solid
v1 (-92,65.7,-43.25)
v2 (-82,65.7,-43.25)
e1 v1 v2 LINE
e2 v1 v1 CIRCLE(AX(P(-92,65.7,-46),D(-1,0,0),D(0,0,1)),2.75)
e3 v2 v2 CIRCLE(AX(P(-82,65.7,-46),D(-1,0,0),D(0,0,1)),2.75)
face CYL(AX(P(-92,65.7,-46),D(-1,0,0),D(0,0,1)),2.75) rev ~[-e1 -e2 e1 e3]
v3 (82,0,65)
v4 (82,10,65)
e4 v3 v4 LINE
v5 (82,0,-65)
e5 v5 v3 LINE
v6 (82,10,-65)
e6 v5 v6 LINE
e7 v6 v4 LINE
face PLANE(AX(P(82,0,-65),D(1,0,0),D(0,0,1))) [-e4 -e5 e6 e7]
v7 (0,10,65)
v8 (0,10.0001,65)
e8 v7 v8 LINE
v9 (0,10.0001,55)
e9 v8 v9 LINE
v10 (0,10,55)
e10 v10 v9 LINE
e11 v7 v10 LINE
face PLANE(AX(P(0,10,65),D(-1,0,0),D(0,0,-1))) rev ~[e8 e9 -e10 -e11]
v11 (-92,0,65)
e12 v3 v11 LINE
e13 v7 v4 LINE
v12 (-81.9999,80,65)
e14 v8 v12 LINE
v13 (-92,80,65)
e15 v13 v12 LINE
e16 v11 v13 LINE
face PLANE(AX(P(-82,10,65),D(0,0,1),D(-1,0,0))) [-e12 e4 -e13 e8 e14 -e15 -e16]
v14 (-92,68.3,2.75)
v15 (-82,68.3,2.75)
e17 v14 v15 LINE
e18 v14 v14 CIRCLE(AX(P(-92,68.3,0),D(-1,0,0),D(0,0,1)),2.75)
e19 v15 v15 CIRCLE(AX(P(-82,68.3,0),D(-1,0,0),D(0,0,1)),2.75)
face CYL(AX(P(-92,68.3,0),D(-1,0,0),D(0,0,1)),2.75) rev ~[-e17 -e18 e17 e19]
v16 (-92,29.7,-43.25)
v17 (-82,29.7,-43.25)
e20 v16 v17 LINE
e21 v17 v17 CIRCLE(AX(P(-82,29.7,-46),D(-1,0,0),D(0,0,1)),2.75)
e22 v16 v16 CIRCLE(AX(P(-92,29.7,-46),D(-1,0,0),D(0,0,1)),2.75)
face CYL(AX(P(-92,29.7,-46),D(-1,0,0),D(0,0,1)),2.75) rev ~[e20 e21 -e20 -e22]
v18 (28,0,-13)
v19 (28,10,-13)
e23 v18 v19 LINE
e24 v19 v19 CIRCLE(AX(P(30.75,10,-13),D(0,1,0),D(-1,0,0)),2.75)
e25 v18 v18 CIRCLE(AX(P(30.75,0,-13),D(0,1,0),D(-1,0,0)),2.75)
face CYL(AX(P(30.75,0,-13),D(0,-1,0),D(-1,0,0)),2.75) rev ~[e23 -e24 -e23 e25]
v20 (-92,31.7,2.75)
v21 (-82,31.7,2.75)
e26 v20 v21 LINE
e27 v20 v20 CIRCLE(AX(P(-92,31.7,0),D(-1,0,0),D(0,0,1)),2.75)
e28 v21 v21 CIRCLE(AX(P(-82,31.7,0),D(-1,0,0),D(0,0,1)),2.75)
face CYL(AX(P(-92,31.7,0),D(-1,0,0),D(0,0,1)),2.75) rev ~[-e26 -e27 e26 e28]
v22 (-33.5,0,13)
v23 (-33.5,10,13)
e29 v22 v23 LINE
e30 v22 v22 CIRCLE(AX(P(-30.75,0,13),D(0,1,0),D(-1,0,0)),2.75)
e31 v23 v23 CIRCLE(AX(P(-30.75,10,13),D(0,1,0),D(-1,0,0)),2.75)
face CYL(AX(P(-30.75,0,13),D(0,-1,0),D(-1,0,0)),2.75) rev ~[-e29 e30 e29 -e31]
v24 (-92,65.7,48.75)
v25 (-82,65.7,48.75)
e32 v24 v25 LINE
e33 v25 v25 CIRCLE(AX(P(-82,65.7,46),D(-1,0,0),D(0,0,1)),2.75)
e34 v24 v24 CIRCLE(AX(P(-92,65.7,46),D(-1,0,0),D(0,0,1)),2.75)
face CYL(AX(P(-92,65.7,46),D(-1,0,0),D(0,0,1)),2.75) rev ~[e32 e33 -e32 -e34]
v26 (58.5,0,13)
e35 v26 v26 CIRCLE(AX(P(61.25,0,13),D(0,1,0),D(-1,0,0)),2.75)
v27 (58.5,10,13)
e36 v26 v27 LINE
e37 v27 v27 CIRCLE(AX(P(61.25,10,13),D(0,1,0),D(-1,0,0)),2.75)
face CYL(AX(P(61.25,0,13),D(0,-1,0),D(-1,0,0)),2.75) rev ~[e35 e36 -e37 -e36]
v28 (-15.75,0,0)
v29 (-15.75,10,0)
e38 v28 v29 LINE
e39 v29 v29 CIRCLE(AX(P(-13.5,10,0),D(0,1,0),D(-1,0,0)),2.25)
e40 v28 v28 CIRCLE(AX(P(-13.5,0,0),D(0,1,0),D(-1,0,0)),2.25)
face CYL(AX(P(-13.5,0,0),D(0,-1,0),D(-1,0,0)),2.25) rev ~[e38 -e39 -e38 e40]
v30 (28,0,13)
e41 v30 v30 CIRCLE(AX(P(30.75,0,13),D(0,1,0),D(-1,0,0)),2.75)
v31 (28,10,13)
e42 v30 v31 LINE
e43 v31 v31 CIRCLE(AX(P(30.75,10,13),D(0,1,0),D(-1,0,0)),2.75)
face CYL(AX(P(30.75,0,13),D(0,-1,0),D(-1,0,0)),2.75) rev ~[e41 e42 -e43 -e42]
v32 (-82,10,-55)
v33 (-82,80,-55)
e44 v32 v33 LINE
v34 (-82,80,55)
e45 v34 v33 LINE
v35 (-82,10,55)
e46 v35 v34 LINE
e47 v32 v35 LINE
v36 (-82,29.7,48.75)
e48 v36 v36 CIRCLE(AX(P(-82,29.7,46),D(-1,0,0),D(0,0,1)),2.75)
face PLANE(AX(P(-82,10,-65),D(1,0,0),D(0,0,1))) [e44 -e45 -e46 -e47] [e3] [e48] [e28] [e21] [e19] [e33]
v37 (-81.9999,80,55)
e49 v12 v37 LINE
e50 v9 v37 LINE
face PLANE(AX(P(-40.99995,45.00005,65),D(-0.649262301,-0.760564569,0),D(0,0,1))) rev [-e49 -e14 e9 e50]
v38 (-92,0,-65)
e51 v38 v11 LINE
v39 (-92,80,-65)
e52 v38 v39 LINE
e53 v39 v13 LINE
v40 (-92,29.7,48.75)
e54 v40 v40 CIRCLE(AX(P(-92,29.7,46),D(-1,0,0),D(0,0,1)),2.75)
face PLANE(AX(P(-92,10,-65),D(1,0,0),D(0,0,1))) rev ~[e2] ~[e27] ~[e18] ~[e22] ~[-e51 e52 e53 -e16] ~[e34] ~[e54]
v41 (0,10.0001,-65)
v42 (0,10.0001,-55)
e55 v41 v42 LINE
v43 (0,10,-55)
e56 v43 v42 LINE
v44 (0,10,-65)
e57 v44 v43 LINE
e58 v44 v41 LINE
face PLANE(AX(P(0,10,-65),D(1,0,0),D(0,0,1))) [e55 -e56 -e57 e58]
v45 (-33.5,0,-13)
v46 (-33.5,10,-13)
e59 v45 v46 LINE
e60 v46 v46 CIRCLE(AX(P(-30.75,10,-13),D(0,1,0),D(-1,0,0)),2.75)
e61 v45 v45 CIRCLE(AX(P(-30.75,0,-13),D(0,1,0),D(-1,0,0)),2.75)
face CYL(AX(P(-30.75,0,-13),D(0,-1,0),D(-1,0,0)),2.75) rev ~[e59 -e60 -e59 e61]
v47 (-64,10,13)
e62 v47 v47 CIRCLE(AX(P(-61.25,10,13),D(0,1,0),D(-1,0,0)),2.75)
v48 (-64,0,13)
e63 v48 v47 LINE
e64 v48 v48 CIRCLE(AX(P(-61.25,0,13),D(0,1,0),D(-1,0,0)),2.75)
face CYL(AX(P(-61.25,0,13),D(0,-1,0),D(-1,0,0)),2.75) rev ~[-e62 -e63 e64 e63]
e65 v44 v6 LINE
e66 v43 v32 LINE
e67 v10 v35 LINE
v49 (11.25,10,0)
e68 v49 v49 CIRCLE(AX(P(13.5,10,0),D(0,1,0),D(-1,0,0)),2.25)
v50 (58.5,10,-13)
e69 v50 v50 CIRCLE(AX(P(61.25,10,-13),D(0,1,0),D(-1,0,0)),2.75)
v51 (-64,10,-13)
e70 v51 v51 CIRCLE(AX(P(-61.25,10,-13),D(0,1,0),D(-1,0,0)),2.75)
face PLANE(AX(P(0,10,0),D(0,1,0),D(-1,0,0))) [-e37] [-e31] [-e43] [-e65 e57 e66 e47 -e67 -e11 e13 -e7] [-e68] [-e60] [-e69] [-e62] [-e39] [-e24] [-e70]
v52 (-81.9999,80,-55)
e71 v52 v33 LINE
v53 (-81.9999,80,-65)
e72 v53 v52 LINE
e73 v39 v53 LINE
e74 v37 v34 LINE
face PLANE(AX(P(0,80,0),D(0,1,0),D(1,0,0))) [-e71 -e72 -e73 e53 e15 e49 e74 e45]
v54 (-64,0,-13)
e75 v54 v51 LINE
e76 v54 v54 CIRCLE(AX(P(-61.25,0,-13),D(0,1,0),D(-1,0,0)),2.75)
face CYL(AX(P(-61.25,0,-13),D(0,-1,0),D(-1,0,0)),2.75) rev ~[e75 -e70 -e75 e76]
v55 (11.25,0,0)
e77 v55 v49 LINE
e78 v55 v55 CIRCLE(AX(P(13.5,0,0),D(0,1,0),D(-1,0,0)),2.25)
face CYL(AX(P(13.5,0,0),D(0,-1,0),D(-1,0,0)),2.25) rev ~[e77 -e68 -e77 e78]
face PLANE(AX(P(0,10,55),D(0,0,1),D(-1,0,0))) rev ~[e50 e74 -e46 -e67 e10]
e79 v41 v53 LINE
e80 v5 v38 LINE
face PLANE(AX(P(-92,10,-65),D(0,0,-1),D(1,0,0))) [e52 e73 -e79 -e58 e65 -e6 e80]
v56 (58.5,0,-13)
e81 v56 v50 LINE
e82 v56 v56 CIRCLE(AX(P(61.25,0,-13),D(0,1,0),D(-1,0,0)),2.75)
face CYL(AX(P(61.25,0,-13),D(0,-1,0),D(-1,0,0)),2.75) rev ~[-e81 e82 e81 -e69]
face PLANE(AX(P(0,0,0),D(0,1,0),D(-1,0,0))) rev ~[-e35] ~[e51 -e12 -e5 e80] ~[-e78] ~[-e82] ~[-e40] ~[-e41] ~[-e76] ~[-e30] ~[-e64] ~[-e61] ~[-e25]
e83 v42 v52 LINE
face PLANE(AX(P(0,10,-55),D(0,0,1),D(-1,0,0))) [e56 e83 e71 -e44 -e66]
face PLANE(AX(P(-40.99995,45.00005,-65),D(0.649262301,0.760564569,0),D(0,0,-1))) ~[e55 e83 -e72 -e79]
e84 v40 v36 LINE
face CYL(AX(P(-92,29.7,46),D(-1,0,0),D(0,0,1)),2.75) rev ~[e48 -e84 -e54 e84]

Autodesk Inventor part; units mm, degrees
ref_plane "YZ Plane" through (0, 0, 0) normal (1, 0, 0) x (0, 1, 0)
ref_plane "XZ Plane" through (0, 0, 0) normal (0, 1, 0) x (-1, 0, 0)
ref_plane "XY Plane" through (0, 0, 0) normal (0, 0, 1) x (1, 0, 0)
sketch "Sketch1" plane through (0, 0, 0) normal (0, 1, 0) x (-1, 0, 0)
  line L0 (20, -4.85) -> (-20, -4.85) construction
  line L1 (-20, -4.85) -> (-20, 4.85) construction
  line L2 (-20, 4.85) -> (20, 4.85) construction
  line L3 (20, 4.85) -> (20, -4.85) construction
  line L4 (0, -4.85) -> (0, 4.85) construction
  line L5 (20, 0) -> (-20, 0) construction
  circle A0 centre (13.5, 0) radius 2.25
  circle A1 centre (-13.5, 0) radius 2.25
  line L6 (67, -18) -> (25, -18) construction
  line L7 (25, -18) -> (25, 18) construction
  line L8 (25, 18) -> (67, 18) construction
  line L9 (67, 18) -> (67, -18) construction
  line L10 (46, -18) -> (46, 18) construction
  line L11 (67, 0) -> (25, 0) construction
  circle A2 centre (61.25, -13) radius 2.75
  circle A3 centre (30.75, -13) radius 2.75
  circle A4 centre (61.25, 13) radius 2.75
  circle A5 centre (30.75, 13) radius 2.75
  line L12 (-67, -18) -> (-25, -18) construction
  line L13 (-25, -18) -> (-25, 18) construction
  line L14 (-25, 18) -> (-67, 18) construction
  line L15 (-67, 18) -> (-67, -18) construction
  line L16 (-46, -18) -> (-46, 18) construction
  line L17 (-67, 0) -> (-25, 0) construction
  circle A6 centre (-61.25, -13) radius 2.75
  circle A7 centre (-30.75, -13) radius 2.75
  circle A8 centre (-61.25, 13) radius 2.75
  circle A9 centre (-30.75, 13) radius 2.75
  line L18 (82, -65) -> (-82, -65)
  line L19 (-82, -65) -> (-82, 65)
  line L20 (-82, 65) -> (82, 65)
  line L21 (82, 65) -> (82, -65)
  point P0 (0, 0)
  point P1 (0, 0)
  dimension "d0" = 40
  dimension "d1" = 9.7
  dimension "d2" = 4.5
  dimension "d3" = 27
  dimension "d4" = 42
  dimension "d6" = 36
  dimension "d7" = 5
  dimension "d8" = 5.5
  dimension "d9" = 30.5
  dimension "d10" = 26
  dimension "d12" = 15
  dimension "d16" = 130
extrude "Extrusion1" add sketch "Sketch1" along normal blind 10
sketch "Sketch5" plane through (-82, 0, -65) normal (-1, 0, 0) x (0, 0, 1)
  line L0 (0, 0) -> (130, 0) projected
  line L1 (130, 0) -> (130, 10) projected
  line L2 (0, 10) -> (130, 10) projected
  line L3 (0, 0) -> (0, 10) projected
  point P0 (65, 0)
extrude "Extrusion4" add sketch "Sketch5" along normal blind 10
sketch "Sketch6" plane through (0, 10, 0) normal (0, 1, 0) x (1, 0, 0)
  line L0 (-92, 65) -> (-92, -65) projected
  line L1 (82, -65) -> (-92, -65) projected
  line L2 (-92, 65) -> (-82, 65)
  line L3 (-82, 65) -> (-82, -65)
  line L4 (-82, -65) -> (-92, -65)
  line L5 (-92, -65) -> (-92, 65)
  point P0 (0, 0)
  dimension "d33" = 10
extrude "Extrusion5" add sketch "Sketch6" along normal blind 80
sketch "Sketch7" plane through (-82, 10, 65) normal (1, 0, 0) x (0, 0, -1)
  line L0 (35, 10) -> (95, 10)
  line L1 (95, 10) -> (95, 70)
  line L2 (95, 70) -> (35, 70)
  line L3 (35, 70) -> (35, 10)
  line L4 (130, 80) -> (0, 80) construction
  line L5 (65, 80) -> (65, 0) construction
  line L6 (62.75, 0) -> (67.25, 0) construction
  line L7 (0, -10) -> (0, 80) construction
  line L8 (130, -10) -> (130, 80) construction
  line L9 (130, 40) -> (0, 40) construction
  point P0 (65, -10)
  dimension "d36" = 60
  dimension "d37" = 60
  dimension "d38" = 40
extrude "Extrusion6" add sketch "Sketch7" along normal blind 10
sketch "Sketch8" plane through (0, 90, 0) normal (0, 1, 0) x (1, 0, 0)
  line L0 (-92, 65) -> (-92, -65) projected
  line L1 (-92, -65) -> (-82, -65) projected
  line L2 (-82, -65) -> (-82, 65) projected
  line L3 (-82, 65) -> (-92, 65) projected
  point P0 (0, 0)
extrude "Extrusion7" cut sketch "Sketch8" against normal up to surface (10 mm away)
sketch "Sketch9" plane through (-72, 10, 65) normal (1, 0, 0) x (0, 0, -1)
  line L0 (95, 10) -> (95, 70) construction
  line L1 (95, 70) -> (35, 70) construction
  line L2 (35, 70) -> (35, 10) construction
  line L3 (35, 10) -> (95, 10) construction
  line L4 (35, 10) -> (35, 70) construction
  line L5 (35, 40) -> (95, 40) construction
  line L6 (95, 10) -> (95, 70) construction
  line L7 (35, 10) -> (95, 10) construction
  line L8 (65, 10) -> (65, 70) construction
  line L9 (95, 70) -> (35, 70) construction
  line L10 (41.45, 63.55) -> (88.55, 63.55) construction
  line L11 (88.55, 63.55) -> (88.55, 16.45) construction
  line L12 (88.55, 16.45) -> (41.45, 16.45) construction
  line L13 (41.45, 16.45) -> (41.45, 63.55) construction
  circle A0 centre (41.45, 63.55) radius 2.75
  circle A1 centre (41.45, 16.45) radius 2.75
  circle A2 centre (88.55, 16.45) radius 2.75
  circle A3 centre (88.55, 63.55) radius 2.75
  circle A4 centre (65, 40) radius 19.05
  point P0 (65, -10)
  dimension "d43" = 47.1
  dimension "d44" = 47.1
  dimension "d45" = 5.5
  dimension "d46" = 5.5
  dimension "d47" = 5.5
  dimension "d48" = 5.5
  dimension "d51" = 38.1
extrude "Extrusion8" cut sketch "Sketch9" against normal through all
sketch "Sketch10" plane through (-92, 0, -65) normal (-1, 0, 0) x (0, 0, 1)
  circle A0 centre (65, 50) radius 19.05 projected
  line L0 (65, 50) -> (0, 50) construction
  line L1 (0, 10) -> (0, 80) projected
  line L2 (65, 50) -> (130, 50) construction
  line L3 (130, 10) -> (130, 80) projected
  line L4 (5, 71.2) -> (33, 71.2) construction
  line L5 (33, 71.2) -> (33, 24.2) construction
  line L6 (33, 24.2) -> (5, 24.2) construction
  line L7 (5, 24.2) -> (5, 71.2) construction
  line L8 (5, 47.7) -> (33, 47.7) construction
  line L9 (65, 50) -> (65, 0) construction
  line L10 (19, 71.2) -> (19, 24.2) construction
  circle A1 centre (19, 65.7) radius 2.75
  circle A2 centre (19, 29.7) radius 2.75
  circle A3 centre (111, 65.7) radius 2.75
  circle A4 centre (111, 29.7) radius 2.75
  point P0 (180, 80)
  dimension "d52" = 28
  dimension "d53" = 47
  dimension "d54" = 2.3
  dimension "d55" = 46
  dimension "d56" = 5.5
  dimension "d57" = 36
extrude "Extrusion9" cut sketch "Sketch10" against normal through all contours A1 | A2 | A3 | A4
sketch "Sketch12" plane through (0, 10, 0) normal (0, 1, 0) x (1, 0, 0)
  line L0 (82, 65) -> (-82, 65) projected
  line L1 (-82, 65) -> (0, 65)
  line L2 (0, 65) -> (0, 55)
  line L3 (0, 55) -> (-82, 55)
  line L4 (-82, 55) -> (-82, 65)
  line L5 (82, -65) -> (82, 65) construction
  line L6 (82, 0) -> (-92, 0) construction
  line L7 (-92, 65) -> (-92, -65) construction
  line L8 (-82, -65) -> (0, -65)
  line L9 (0, -65) -> (0, -55)
  line L10 (0, -55) -> (-82, -55)
  line L11 (-82, -55) -> (-82, -65)
  point P0 (0, 0)
  dimension "d70" = 82
  dimension "d71" = 10
extrude "Extrusion11" add sketch "Sketch12" along normal up to surface (70 mm away)
chamfer "Chamfer3" distance 70 distance2 82 1 edges at (0, 80, -60) measured on face at (0, 33.3333, -58.3333)
chamfer "Chamfer4" distance 70 distance2 82 1 edges at (0, 80, 60) measured on face at (0, 33.3333, 61.6667)
sketch "Sketch13" plane through (-72, 10, 65) normal (1, 0, 0) x (0, 0, -1)
  line L0 (95, 10) -> (35, 10) projected
  line L1 (95, 10) -> (95, 70) projected
  line L2 (35, 10) -> (95, 10)
  line L3 (95, 10) -> (95, 70)
  line L4 (95, 70) -> (35, 70)
  line L5 (35, 70) -> (35, 10)
  point P0 (65, -10)
extrude "Extrusion12" add sketch "Sketch13" against normal blind 20
sketch "Sketch14" plane through (-72, 10, 65) normal (1, 0, 0) x (0, 0, -1)
  line L0 (95, 10) -> (95, 70) projected
  line L1 (95, 70) -> (35, 70) projected
  line L2 (35, 70) -> (35, 10) projected
  line L3 (35, 10) -> (95, 10) projected
  point P0 (65, -10)
extrude "Extrusion13" cut sketch "Sketch14" against normal blind 10
sketch "Sketch15" plane through (-92, 0, -65) normal (-1, 0, 0) x (0, 0, 1)
  circle A0 centre (19, 29.7) radius 2.75 construction
  circle A1 centre (19, 65.7) radius 2.75 construction
  line L0 (19, 29.7) -> (19, 65.7) construction
  circle A2 centre (111, 29.7) radius 2.75 construction
  circle A3 centre (111, 65.7) radius 2.75 construction
  line L1 (111, 29.7) -> (111, 65.7) construction
  line L2 (19, 47.7) -> (111, 47.7) construction
  line L3 (51.5, 74) -> (78.5, 74) construction
  line L4 (78.5, 74) -> (78.5, 26) construction
  line L5 (78.5, 26) -> (51.5, 26) construction
  line L6 (51.5, 26) -> (51.5, 74) construction
  line L7 (51.5, 50) -> (78.5, 50) construction
  line L8 (130, 80) -> (0, 80) construction
  line L9 (65, 80) -> (65, 0) construction
  line L10 (65, 74) -> (65, 26) construction
  circle A4 centre (65, 68.3) radius 2.75
  circle A5 centre (65, 31.7) radius 2.75
  dimension "d84" = 27
  dimension "d85" = 48
  dimension "d86" = 2.3
  dimension "d87" = 5.5
  dimension "d88" = 36.6
extrude "Extrusion14" cut sketch "Sketch15" against normal blind 10
properties part number "positioner_base"
